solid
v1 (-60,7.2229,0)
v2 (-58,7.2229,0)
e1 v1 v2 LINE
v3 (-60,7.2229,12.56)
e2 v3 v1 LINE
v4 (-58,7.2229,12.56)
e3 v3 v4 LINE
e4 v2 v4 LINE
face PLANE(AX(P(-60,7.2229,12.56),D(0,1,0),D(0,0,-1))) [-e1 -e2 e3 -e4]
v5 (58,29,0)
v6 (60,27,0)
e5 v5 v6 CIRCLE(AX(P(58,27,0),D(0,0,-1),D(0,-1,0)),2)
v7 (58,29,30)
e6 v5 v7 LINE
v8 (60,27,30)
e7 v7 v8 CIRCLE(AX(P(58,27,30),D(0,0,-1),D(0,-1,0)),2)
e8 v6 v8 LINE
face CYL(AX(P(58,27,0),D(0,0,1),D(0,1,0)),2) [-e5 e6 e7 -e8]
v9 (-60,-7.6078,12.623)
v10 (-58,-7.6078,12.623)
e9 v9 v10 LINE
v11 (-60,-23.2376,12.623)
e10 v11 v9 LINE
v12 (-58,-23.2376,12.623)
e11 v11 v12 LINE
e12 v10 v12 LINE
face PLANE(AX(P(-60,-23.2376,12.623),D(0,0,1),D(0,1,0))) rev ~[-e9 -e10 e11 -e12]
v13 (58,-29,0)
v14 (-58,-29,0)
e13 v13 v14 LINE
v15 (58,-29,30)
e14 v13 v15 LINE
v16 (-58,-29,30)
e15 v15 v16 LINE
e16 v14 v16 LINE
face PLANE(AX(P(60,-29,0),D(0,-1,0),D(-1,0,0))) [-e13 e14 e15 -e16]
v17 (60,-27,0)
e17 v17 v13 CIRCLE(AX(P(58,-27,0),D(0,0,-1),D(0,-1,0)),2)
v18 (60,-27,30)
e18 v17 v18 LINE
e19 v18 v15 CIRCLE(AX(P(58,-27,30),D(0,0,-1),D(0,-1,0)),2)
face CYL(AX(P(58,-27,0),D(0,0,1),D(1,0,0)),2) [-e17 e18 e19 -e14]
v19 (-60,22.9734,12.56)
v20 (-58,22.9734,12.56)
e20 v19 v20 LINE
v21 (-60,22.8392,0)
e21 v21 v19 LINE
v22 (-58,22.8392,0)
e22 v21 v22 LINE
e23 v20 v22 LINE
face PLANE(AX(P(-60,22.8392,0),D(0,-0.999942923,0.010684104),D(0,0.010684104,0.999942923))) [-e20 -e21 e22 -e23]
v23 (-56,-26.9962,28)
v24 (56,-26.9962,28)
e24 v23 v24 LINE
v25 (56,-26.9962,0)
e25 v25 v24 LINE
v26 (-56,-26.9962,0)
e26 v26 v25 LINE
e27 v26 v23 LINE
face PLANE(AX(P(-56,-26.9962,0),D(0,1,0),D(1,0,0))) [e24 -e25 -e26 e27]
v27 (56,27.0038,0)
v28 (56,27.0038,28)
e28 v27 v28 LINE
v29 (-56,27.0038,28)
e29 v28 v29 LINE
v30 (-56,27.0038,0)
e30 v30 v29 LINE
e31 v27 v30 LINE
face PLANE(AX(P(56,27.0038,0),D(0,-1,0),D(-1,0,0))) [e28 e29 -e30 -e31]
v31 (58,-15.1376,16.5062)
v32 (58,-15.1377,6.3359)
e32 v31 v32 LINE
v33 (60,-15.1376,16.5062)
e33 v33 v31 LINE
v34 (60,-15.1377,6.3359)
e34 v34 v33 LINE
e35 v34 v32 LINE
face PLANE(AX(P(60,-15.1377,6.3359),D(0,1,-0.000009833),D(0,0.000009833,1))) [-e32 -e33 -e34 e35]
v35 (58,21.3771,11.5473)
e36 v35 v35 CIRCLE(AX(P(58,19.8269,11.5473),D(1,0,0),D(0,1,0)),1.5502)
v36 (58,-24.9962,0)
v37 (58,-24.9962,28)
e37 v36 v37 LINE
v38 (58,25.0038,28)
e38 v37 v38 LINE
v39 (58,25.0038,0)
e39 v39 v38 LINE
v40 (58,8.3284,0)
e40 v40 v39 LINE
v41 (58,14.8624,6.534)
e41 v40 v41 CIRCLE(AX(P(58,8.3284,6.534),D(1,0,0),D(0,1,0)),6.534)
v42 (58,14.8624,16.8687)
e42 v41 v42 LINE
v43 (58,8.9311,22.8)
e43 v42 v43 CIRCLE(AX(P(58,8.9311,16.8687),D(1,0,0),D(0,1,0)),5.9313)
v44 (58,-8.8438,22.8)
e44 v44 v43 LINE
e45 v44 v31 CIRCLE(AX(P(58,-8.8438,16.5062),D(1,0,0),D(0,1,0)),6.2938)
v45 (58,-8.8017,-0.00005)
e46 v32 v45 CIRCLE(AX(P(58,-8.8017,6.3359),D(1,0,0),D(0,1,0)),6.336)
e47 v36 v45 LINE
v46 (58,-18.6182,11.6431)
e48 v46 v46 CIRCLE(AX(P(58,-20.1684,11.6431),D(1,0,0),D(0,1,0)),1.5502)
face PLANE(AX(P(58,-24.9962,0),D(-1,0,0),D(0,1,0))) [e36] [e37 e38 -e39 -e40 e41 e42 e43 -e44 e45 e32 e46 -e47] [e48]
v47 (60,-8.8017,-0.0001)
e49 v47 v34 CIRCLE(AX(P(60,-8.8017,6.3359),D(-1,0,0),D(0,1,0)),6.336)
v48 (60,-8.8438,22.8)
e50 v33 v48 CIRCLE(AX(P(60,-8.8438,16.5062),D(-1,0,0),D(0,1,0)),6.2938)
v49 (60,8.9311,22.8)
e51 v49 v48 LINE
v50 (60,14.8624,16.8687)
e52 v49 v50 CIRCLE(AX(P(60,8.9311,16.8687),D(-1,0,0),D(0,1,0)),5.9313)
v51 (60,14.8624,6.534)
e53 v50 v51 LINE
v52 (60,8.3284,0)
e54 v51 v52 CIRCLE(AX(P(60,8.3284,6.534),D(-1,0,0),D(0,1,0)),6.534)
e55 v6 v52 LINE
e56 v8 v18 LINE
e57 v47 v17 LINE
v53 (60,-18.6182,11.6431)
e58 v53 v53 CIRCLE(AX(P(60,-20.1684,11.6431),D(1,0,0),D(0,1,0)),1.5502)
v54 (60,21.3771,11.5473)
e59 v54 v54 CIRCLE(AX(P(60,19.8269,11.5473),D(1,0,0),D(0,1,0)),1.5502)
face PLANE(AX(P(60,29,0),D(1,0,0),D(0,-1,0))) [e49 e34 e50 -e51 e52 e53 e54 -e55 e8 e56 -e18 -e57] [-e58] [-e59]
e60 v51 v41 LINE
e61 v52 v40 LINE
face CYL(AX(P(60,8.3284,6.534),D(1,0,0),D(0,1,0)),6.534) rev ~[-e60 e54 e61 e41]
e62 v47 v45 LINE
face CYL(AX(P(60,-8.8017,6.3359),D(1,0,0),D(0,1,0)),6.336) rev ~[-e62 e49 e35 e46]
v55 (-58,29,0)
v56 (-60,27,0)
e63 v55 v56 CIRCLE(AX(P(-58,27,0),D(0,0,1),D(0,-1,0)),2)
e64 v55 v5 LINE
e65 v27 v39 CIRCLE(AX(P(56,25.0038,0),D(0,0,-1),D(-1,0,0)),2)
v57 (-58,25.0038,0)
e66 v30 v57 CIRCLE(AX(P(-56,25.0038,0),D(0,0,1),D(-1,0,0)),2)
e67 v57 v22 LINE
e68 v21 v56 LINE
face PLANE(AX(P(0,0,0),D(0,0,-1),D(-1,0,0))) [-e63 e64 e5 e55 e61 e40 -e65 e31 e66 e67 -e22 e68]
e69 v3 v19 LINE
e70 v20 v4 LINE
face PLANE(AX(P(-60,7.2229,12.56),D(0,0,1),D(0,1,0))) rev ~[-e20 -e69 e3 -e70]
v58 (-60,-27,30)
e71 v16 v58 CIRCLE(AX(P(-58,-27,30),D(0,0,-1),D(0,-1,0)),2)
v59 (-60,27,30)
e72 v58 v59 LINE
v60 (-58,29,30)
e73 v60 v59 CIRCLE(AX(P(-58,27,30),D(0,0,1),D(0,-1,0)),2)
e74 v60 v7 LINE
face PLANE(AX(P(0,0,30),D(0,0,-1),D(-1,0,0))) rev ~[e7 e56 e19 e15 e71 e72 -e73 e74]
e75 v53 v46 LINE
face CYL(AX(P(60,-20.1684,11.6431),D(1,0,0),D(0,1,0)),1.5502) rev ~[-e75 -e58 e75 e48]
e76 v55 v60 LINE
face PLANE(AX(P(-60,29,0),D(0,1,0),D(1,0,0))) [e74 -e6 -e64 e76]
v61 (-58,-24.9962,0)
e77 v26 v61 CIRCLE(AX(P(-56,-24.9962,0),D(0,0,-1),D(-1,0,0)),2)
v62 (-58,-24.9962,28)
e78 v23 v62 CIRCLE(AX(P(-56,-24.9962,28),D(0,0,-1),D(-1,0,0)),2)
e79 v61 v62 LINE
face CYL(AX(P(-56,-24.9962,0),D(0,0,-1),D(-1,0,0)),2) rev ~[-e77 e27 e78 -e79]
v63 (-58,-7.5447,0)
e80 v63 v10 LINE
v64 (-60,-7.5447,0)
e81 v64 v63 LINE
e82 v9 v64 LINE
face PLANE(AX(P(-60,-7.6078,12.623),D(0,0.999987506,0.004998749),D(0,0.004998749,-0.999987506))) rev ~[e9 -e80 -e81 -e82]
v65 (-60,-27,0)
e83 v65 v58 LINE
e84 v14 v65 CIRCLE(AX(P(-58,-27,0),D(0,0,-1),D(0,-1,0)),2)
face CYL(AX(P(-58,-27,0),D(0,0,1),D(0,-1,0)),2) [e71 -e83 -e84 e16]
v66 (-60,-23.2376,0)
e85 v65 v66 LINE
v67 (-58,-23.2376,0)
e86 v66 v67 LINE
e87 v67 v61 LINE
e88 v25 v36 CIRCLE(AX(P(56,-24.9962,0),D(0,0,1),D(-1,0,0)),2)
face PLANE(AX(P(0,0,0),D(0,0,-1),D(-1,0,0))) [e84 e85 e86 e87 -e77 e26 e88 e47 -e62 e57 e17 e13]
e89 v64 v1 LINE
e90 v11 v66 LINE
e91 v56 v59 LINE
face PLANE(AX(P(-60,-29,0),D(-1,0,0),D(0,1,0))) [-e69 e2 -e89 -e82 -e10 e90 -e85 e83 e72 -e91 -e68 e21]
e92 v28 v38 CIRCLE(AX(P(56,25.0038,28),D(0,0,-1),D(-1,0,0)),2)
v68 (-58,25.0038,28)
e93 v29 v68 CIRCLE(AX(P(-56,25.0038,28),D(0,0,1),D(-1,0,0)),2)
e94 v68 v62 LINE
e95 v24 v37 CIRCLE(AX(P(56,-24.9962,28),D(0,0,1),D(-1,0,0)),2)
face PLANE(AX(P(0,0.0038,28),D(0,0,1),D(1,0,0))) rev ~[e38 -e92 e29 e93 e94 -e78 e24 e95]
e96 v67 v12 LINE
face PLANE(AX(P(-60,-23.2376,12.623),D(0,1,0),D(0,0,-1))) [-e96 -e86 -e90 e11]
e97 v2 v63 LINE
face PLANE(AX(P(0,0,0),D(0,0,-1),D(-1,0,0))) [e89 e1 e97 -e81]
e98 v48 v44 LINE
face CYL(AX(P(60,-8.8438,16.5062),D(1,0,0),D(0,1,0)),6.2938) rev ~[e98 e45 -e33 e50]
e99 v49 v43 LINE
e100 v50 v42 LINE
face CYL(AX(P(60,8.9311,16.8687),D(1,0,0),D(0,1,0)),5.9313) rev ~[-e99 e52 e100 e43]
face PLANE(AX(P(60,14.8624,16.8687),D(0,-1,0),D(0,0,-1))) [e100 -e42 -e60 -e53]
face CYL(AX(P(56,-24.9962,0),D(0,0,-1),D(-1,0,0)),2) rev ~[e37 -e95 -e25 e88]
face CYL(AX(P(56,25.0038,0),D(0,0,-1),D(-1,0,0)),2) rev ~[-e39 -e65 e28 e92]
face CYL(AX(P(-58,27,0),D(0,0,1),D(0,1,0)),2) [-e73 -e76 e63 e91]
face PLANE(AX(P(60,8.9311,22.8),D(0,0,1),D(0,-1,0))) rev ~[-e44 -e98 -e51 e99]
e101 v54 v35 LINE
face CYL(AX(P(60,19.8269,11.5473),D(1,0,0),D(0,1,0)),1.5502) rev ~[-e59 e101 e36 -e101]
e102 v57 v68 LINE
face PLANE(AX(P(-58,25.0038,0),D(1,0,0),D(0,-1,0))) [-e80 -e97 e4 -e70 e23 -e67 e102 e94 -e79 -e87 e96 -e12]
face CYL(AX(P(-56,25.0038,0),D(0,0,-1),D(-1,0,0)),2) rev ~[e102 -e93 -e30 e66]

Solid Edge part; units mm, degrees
sketch "Sketch1" plane through (0, 0, 0) normal (0, 0, 1) x (1, 0, 0)
  line L0 (-60, 29) -> (60, 29)
  line L1 (60, 29) -> (60, -29)
  line L2 (60, -29) -> (-60, -29)
  line L3 (-60, -29) -> (-60, 29)
  dimension "D1" = 120
  dimension "D2" = 58
extrude "Protrusion1" add sketch "Sketch1" along normal blind 30
fillet "Redondo_1" radius 2 4 edges at (60, 29, 15) (60, -29, 15) (-60, 29, 15) (-60, -29, 15)
sketch "Sketch2" plane through (0, 0, 0) normal (0, 0, -1) x (-1, 0, 0)
  line L0 (-56, 27.0038) -> (56, 27.0038)
  arc A0 (56, 27.0038) -> (58, 25.0038) centre (56, 25.0038) cw
  line L1 (58, 25.0038) -> (58, -24.9962)
  arc A1 (56, -26.9962) -> (58, -24.9962) centre (56, -24.9962) ccw
  line L2 (56, -26.9962) -> (-56, -26.9962)
  arc A2 (-56, -26.9962) -> (-58, -24.9962) centre (-56, -24.9962) cw
  line L3 (-58, -24.9962) -> (-58, 25.0038)
  arc A3 (-56, 27.0038) -> (-58, 25.0038) centre (-56, 25.0038) ccw
  dimension "D1" = 2.0038
  dimension "D2" = 2
extrude "Cutout1" cut sketch "Sketch2" against normal blind 28
sketch "Sketch3" plane through (60, 0, 15) normal (1, 0, 0) x (0, 1, 0)
  circle A0 centre (19.8269, -3.4527) radius 1.5502
  circle A1 centre (-20.1684, -3.3569) radius 1.5502
  line L0 (14.8624, 1.8687) -> (14.8624, -8.466)
  arc A2 (14.8624, -8.466) -> (8.3284, -15) centre (8.3284, -8.466) cw
  line L1 (-8.8017, -15) -> (8.3284, -15)
  arc A3 (-8.8017, -15) -> (-15.1376, -8.6641) centre (-8.8017, -8.6641) cw
  line L2 (-15.1376, -8.6641) -> (-15.1376, 1.5062)
  arc A4 (-15.1376, 1.5062) -> (-8.8438, 7.8) centre (-8.8438, 1.5062) cw
  line L3 (8.9311, 7.8) -> (-8.8438, 7.8)
  arc A5 (8.9311, 7.8) -> (14.8624, 1.8687) centre (8.9311, 1.8687) cw
extrude "Recorte_Extrudado_3" cut sketch "Sketch3" against normal blind 5
sketch "Sketch4" plane through (-60, 0, 15) normal (-1, 0, 0) x (0, -1, 0)
  line L0 (-7.2229, -2.44) -> (-22.9734, -2.44)
  line L1 (-22.8392, -15) -> (-22.9734, -2.44)
  line L2 (-7.2229, -15) -> (-22.8392, -15)
  line L3 (-7.2229, -2.44) -> (-7.2229, -15)
  line L4 (23.2376, -2.377) -> (7.6078, -2.377)
  line L5 (7.6078, -2.377) -> (7.5447, -15)
  line L6 (7.5447, -15) -> (23.2376, -15)
  line L7 (23.2376, -2.377) -> (23.2376, -15)
extrude "Recorte_Extrudado_4" cut sketch "Sketch4" against normal blind 4
